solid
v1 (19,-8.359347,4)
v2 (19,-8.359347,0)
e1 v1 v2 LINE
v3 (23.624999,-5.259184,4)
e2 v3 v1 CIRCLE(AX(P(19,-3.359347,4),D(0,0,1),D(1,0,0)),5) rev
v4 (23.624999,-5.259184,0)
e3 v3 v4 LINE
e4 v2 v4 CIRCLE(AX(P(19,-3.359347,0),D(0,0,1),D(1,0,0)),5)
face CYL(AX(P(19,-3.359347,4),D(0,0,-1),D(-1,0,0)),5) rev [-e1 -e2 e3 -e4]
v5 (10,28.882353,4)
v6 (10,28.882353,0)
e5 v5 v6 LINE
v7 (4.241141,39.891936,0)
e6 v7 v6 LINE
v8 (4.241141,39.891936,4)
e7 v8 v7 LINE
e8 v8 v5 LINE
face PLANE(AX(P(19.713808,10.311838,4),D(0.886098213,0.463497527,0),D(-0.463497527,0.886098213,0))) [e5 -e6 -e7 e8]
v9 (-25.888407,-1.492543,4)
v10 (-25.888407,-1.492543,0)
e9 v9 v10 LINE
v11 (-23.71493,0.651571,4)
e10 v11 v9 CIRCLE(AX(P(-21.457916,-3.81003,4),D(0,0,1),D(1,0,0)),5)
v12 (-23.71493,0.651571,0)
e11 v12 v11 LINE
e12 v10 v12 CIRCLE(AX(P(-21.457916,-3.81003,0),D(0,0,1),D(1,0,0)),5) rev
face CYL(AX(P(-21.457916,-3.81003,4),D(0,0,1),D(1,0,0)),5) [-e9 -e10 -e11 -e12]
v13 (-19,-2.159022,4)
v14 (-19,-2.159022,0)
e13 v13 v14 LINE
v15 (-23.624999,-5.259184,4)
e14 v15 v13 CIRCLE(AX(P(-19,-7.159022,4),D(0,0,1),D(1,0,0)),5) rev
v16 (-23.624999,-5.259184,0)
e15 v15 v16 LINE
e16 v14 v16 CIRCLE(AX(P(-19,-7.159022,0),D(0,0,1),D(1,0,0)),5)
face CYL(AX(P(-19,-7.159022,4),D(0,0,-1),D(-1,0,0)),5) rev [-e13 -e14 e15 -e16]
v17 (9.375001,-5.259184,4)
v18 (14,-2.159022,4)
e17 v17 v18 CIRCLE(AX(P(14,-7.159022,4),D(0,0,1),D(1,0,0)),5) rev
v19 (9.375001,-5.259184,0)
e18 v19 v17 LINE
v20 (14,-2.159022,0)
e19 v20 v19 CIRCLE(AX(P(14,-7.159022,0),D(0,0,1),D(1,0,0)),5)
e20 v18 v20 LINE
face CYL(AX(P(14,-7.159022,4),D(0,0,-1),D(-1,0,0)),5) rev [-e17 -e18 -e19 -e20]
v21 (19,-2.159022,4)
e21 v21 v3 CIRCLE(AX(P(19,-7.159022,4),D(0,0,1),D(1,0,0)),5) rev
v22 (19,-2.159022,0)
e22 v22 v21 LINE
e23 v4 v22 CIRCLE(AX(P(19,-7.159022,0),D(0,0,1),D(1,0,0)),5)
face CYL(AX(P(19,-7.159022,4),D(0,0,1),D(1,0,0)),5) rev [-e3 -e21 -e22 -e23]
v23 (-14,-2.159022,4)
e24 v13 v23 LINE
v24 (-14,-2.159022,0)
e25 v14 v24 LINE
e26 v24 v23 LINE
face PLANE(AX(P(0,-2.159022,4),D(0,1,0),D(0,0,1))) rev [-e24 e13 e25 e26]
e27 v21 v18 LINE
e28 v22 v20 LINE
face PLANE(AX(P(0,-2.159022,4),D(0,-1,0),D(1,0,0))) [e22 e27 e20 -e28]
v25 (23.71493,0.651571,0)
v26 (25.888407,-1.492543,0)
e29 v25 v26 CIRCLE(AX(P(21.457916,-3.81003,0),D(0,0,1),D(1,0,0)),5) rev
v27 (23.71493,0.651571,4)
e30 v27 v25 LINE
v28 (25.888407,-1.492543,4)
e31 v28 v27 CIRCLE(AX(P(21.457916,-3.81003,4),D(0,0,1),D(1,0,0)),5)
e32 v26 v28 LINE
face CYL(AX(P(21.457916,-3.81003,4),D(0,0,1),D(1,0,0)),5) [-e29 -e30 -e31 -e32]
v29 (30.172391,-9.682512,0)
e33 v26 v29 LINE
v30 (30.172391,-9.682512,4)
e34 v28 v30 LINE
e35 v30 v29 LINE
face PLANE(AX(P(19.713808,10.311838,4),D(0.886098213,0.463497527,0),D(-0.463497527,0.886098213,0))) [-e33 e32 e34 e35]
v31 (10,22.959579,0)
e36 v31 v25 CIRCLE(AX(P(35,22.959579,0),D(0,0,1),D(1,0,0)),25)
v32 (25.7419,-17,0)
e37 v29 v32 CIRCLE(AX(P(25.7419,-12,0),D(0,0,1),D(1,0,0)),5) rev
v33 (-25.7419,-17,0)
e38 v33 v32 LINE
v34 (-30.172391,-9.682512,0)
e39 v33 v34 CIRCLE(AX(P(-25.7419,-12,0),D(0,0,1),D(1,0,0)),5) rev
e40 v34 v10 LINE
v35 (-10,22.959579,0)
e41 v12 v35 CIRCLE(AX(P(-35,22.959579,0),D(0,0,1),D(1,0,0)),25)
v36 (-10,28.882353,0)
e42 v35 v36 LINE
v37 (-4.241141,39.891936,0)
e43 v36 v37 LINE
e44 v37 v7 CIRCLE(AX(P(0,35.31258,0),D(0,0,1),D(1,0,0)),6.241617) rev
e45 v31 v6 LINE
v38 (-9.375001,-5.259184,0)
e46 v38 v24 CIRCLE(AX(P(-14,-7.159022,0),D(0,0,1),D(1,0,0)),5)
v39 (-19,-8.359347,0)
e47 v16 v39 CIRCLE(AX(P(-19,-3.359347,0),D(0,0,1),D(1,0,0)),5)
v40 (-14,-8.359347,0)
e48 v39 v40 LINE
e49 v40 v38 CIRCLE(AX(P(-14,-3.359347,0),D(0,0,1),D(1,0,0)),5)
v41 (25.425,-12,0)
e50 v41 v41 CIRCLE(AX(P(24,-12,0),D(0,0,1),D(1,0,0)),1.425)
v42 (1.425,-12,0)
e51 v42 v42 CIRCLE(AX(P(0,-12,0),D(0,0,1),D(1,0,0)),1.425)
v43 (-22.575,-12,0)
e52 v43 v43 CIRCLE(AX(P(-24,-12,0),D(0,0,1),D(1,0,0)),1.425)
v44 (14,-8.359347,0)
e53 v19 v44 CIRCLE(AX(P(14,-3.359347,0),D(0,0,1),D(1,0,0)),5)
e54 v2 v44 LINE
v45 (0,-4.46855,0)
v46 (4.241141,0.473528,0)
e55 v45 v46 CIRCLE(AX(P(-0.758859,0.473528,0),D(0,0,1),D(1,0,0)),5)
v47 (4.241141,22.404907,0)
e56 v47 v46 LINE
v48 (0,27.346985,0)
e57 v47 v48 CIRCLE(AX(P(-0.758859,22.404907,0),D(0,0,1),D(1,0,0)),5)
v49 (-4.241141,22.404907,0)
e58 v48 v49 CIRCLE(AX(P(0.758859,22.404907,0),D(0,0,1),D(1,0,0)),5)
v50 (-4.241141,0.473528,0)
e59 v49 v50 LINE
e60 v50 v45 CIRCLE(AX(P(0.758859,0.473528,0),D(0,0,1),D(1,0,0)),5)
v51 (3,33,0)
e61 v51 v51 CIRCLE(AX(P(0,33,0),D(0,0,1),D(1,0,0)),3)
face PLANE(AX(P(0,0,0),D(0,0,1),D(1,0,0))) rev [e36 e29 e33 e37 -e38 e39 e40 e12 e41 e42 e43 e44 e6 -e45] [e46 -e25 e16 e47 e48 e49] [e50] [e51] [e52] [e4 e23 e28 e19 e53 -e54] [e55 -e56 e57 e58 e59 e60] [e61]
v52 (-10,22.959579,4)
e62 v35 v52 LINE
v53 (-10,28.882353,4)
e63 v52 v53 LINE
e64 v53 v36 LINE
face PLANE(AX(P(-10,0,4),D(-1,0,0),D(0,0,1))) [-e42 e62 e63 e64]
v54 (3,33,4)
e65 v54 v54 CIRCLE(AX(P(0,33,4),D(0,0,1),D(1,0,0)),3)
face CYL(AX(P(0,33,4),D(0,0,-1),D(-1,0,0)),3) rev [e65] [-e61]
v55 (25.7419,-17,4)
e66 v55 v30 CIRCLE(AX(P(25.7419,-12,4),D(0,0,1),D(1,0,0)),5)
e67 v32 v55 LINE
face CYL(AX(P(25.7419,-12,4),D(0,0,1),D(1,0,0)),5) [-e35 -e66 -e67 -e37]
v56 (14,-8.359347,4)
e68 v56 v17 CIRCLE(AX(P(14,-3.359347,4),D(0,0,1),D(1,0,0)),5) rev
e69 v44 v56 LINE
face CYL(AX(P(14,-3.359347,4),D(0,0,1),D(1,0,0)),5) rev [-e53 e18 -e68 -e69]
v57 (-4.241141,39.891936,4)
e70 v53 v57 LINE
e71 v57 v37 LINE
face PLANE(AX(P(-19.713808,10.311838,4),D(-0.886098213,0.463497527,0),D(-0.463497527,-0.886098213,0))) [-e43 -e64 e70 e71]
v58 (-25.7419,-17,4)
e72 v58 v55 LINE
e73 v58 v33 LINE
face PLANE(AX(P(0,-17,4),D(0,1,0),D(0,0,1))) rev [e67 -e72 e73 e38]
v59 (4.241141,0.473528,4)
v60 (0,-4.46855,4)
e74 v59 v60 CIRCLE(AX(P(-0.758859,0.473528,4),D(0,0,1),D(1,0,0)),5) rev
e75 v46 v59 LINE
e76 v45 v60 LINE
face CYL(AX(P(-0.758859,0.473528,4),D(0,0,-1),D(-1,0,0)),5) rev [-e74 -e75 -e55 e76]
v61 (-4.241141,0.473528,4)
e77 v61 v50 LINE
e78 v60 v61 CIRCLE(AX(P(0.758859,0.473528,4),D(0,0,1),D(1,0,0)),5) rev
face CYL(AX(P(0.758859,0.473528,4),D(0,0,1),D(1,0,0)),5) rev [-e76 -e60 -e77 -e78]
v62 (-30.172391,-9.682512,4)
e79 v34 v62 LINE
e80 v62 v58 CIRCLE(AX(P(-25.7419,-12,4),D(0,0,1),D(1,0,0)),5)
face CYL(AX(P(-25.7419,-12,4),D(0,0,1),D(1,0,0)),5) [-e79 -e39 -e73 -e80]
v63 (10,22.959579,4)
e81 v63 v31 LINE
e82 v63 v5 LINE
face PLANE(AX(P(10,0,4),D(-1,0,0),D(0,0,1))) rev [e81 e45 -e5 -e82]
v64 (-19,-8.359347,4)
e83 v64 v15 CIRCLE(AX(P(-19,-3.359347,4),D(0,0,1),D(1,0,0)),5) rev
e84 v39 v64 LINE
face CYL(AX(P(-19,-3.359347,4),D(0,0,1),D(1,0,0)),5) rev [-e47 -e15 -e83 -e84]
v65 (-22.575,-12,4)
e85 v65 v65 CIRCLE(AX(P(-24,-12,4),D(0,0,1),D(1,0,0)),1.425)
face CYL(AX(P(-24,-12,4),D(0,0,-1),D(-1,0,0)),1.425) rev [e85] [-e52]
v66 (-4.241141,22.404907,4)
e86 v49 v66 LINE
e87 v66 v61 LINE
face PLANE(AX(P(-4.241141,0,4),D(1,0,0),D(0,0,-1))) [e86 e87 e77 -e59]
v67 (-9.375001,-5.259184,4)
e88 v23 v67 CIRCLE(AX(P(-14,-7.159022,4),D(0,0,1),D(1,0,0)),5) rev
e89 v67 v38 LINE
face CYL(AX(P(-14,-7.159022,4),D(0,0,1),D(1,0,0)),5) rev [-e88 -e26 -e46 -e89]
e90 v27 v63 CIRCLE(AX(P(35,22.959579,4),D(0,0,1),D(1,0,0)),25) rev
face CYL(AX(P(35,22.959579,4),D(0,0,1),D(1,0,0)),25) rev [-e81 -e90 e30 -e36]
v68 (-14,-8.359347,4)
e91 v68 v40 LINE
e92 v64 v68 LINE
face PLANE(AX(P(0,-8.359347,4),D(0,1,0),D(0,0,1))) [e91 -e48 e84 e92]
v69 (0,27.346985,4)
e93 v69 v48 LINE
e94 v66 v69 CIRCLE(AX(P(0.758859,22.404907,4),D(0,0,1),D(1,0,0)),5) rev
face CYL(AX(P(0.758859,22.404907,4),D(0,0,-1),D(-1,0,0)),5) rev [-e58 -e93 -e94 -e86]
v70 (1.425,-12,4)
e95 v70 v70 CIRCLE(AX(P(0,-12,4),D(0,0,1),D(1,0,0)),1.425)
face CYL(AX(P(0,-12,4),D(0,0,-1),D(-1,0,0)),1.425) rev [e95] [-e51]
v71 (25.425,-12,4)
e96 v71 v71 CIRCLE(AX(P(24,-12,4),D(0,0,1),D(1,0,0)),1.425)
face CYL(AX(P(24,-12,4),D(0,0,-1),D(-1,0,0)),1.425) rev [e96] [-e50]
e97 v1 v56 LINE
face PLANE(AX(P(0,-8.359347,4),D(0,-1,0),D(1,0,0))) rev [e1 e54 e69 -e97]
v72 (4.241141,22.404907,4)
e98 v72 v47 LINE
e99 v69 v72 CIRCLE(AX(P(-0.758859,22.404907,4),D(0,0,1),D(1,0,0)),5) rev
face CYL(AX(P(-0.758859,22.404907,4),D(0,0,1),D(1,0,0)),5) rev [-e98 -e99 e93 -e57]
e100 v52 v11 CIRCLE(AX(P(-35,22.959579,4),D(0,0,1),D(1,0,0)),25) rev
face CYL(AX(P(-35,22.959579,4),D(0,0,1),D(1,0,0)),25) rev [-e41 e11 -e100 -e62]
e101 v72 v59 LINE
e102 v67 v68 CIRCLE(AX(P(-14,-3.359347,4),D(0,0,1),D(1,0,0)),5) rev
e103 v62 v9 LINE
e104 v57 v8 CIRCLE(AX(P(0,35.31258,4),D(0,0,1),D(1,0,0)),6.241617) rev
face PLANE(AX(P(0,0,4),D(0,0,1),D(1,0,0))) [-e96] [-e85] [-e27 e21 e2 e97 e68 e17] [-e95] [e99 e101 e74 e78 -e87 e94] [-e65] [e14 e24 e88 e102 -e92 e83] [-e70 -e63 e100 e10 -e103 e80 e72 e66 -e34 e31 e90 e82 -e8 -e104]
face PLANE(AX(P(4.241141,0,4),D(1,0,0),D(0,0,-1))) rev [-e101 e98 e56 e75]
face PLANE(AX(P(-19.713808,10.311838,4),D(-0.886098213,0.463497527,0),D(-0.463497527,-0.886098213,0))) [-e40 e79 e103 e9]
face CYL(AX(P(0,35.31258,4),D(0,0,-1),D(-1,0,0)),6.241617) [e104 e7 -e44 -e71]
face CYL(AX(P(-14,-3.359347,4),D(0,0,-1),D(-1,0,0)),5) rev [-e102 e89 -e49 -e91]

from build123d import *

# Parameters (mm, degrees)
SKETCH1_W           = 8.482282434
SKETCH1_H           = 31.931379298
SKETCH1_R           = 3
SKETCH1_W_2         = 15
SKETCH1_H_2         = 6.200324761
SKETCH1_R_2         = 1.425
BOSS_EXTRUDE1_DEPTH = 4
FILLET3_R           = 25
FILLET4_R           = 5


with BuildPart() as part:
    # Sketch1 → Boss-Extrude1 (new body)
    with BuildSketch(Plane.XY):
        with BuildLine():
            ThreePointArc((4.241141217, 39.891935908), (0, 41.554196678), (-4.241141217, 39.891935908))
            Line((-4.241141217, 39.891935908), (-10, 28.882352941))
            Line((-10, 28.882352941), (-10, 0))
            Line((-10, 0), (-25.107692308, 0))
            Line((-25.107692308, 0), (-34, -17))
            Line((-34, -17), (34, -17))
            Line((34, -17), (25.107692308, 0))
            Line((25.107692308, 0), (10, 0))
            Line((10, 0), (10, 28.882352941))
            Line((10, 28.882352941), (4.241141217, 39.891935908))
        make_face()
        with Locations((0, 11.439217567)):
            Rectangle(SKETCH1_W, SKETCH1_H, mode=Mode.SUBTRACT)
        with Locations((0, 33)):
            Circle(SKETCH1_R, mode=Mode.SUBTRACT)
        with Locations((16.5, -5.259184167)):
            Rectangle(SKETCH1_W_2, SKETCH1_H_2, mode=Mode.SUBTRACT)
        with Locations((24, -12)):
            Circle(SKETCH1_R_2, mode=Mode.SUBTRACT)
        with Locations((-24, -12)):
            Circle(SKETCH1_R_2, mode=Mode.SUBTRACT)
        with Locations((-16.5, -5.259184167)):
            Rectangle(SKETCH1_W_2, SKETCH1_H_2, mode=Mode.SUBTRACT)
        with Locations((0, -12)):
            Circle(SKETCH1_R_2, mode=Mode.SUBTRACT)
    extrude(amount=BOSS_EXTRUDE1_DEPTH)

    # Fillet3
    # the kernel refuses this fillet: 25 mm, written as the material it adds along each edge
    with BuildSketch(Plane(origin=(10, 0, 0), x_dir=(1, 0, 0), z_dir=(0, 0, 1))) as fillet3_piece_1:
        with BuildLine():
            CenterArc((25, 22.959578579), FILLET3_R, 180, 66.690841486)
            Line((0, 22.959578579), (-0.5, 22.959578579))
            Line((-0.5, 22.959578579), (-0.5, 0))
            Line((-0.5, 0), (0, -0.5))
            ThreePointArc((0, -0.5), (7.553846154, -0.5), (14.909846154, -0.459191572))
            Line((14.909846154, -0.459191572), (15.107692308, 0))
        make_face()
    extrude(amount=4)
    with BuildSketch(Plane(origin=(-10, 0, 0), x_dir=(0, 1, 0), z_dir=(0, 0, 1))) as fillet3_piece_2:
        with BuildLine():
            CenterArc((22.959578579, 25), FILLET3_R, 203.309158514, 66.690841486)
            Line((0, 15.107692308), (-0.459191572, 14.909846154))
            ThreePointArc((-0.459191572, 14.909846154), (-0.5, 7.553846154), (-0.5, 0))
            Line((-0.5, 0), (0, -0.5))
            Line((0, -0.5), (22.959578579, -0.5))
            Line((22.959578579, -0.5), (22.959578579, 0))
        make_face()
    extrude(amount=4)

    # Fillet4
    # the kernel refuses this fillet: 5 mm, written as the material it adds along each edge
    with BuildSketch(Plane(origin=(4.241141217, -4.526472082, 0), x_dir=(0, 1, 0), z_dir=(0, 0, 1)), Plane(origin=(4.241141217, 27.404907216, 0), x_dir=(-1, 0, 0), z_dir=(0, 0, 1)), Plane(origin=(-24, -2.159021786, 0), x_dir=(0, -1, 0), z_dir=(0, 0, 1)), Plane(origin=(-9, -2.159021786, 0), x_dir=(-1, 0, 0), z_dir=(0, 0, 1)), Plane(origin=(9, -8.359346547, 0), x_dir=(1, 0, 0), z_dir=(0, 0, 1)), Plane(origin=(9, -2.159021786, 0), x_dir=(0, -1, 0), z_dir=(0, 0, 1))) as fillet4_piece_1:
        with BuildLine():
            CenterArc((FILLET4_R, FILLET4_R), FILLET4_R, 180, 90)
            Line((0, FILLET4_R), (0, 0))
            Line((0, 0), (FILLET4_R, 0))
        make_face()
    extrude(amount=4)
    with BuildSketch(Plane(origin=(-4.241141217, -4.526472082, 0), x_dir=(0, 1, 0), z_dir=(0, 0, 1)), Plane(origin=(-4.241141217, 27.404907216, 0), x_dir=(1, 0, 0), z_dir=(0, 0, 1)), Plane(origin=(-24, -8.359346547, 0), x_dir=(0, 1, 0), z_dir=(0, 0, 1)), Plane(origin=(-9, -8.359346547, 0), x_dir=(-1, 0, 0), z_dir=(0, 0, 1)), Plane(origin=(24, -8.359346547, 0), x_dir=(-1, 0, 0), z_dir=(0, 0, 1)), Plane(origin=(24, -2.159021786, 0), x_dir=(0, -1, 0), z_dir=(0, 0, 1))) as fillet4_piece_2:
        with BuildLine():
            CenterArc((FILLET4_R, -FILLET4_R), FILLET4_R, 90, 90)
            Line((0, -FILLET4_R), (0, 0))
            Line((0, 0), (FILLET4_R, 0))
        make_face()
    extrude(amount=4)
    # the kernel refuses this fillet: 5 mm, written as the material it takes off along each edge
    with BuildSketch(Plane(origin=(34, -17, -20.64524995), x_dir=(-1, 0, 0), z_dir=(0, 0, 1)), Plane(origin=(-34, -17, -20.64524995), x_dir=(0.46349752669999783, 0.88609821280882, 0), z_dir=(0, 0, 1))) as fillet4_2_piece_1:
        with BuildLine():
            CenterArc((FILLET4_R * 1.65161999601, -FILLET4_R), FILLET4_R, 90, 117.613027823)
            Line((FILLET4_R * 0.765521783197, -FILLET4_R * 1.4634975267), (0, 0))
            Line((0, 0), (FILLET4_R * 1.65161999601, 0))
        make_face()
    extrude(amount=45.2904999, mode=Mode.SUBTRACT)
    with BuildSketch(Plane(origin=(25.107692308, 0, -4.210996565), x_dir=(-0.9057801330120623, 0.42374798010214837, 0), z_dir=(0, 0, 1))) as fillet4_2_piece_2:
        with BuildLine():
            CenterArc((1.691402393, 4.997635108), FILLET4_R, 232.68446816, 35.553250017)
            Line((-1.339617689, 1.021089212), (0, 0))
            ThreePointArc((0, 0), (0.768819269, 0.011824458), (1.537638539, 0))
        make_face()
    extrude(amount=12.421993131, mode=Mode.SUBTRACT)
    with BuildSketch(Plane(origin=(-25.107692308, 0, -4.210996565), x_dir=(0.9057801330120621, 0.4237479801021487, 0), z_dir=(0, 0, 1))) as fillet4_2_piece_3:
        with BuildLine():
            CenterArc((1.691402393, -4.997635108), FILLET4_R, 91.762281823, 35.553250017)
            Line((-1.339617689, -1.021089212), (0, 0))
            ThreePointArc((0, 0), (0.768819269, -0.011824458), (1.537638539, 0))
        make_face()
    extrude(amount=12.421993131, mode=Mode.SUBTRACT)


solid = part.part
